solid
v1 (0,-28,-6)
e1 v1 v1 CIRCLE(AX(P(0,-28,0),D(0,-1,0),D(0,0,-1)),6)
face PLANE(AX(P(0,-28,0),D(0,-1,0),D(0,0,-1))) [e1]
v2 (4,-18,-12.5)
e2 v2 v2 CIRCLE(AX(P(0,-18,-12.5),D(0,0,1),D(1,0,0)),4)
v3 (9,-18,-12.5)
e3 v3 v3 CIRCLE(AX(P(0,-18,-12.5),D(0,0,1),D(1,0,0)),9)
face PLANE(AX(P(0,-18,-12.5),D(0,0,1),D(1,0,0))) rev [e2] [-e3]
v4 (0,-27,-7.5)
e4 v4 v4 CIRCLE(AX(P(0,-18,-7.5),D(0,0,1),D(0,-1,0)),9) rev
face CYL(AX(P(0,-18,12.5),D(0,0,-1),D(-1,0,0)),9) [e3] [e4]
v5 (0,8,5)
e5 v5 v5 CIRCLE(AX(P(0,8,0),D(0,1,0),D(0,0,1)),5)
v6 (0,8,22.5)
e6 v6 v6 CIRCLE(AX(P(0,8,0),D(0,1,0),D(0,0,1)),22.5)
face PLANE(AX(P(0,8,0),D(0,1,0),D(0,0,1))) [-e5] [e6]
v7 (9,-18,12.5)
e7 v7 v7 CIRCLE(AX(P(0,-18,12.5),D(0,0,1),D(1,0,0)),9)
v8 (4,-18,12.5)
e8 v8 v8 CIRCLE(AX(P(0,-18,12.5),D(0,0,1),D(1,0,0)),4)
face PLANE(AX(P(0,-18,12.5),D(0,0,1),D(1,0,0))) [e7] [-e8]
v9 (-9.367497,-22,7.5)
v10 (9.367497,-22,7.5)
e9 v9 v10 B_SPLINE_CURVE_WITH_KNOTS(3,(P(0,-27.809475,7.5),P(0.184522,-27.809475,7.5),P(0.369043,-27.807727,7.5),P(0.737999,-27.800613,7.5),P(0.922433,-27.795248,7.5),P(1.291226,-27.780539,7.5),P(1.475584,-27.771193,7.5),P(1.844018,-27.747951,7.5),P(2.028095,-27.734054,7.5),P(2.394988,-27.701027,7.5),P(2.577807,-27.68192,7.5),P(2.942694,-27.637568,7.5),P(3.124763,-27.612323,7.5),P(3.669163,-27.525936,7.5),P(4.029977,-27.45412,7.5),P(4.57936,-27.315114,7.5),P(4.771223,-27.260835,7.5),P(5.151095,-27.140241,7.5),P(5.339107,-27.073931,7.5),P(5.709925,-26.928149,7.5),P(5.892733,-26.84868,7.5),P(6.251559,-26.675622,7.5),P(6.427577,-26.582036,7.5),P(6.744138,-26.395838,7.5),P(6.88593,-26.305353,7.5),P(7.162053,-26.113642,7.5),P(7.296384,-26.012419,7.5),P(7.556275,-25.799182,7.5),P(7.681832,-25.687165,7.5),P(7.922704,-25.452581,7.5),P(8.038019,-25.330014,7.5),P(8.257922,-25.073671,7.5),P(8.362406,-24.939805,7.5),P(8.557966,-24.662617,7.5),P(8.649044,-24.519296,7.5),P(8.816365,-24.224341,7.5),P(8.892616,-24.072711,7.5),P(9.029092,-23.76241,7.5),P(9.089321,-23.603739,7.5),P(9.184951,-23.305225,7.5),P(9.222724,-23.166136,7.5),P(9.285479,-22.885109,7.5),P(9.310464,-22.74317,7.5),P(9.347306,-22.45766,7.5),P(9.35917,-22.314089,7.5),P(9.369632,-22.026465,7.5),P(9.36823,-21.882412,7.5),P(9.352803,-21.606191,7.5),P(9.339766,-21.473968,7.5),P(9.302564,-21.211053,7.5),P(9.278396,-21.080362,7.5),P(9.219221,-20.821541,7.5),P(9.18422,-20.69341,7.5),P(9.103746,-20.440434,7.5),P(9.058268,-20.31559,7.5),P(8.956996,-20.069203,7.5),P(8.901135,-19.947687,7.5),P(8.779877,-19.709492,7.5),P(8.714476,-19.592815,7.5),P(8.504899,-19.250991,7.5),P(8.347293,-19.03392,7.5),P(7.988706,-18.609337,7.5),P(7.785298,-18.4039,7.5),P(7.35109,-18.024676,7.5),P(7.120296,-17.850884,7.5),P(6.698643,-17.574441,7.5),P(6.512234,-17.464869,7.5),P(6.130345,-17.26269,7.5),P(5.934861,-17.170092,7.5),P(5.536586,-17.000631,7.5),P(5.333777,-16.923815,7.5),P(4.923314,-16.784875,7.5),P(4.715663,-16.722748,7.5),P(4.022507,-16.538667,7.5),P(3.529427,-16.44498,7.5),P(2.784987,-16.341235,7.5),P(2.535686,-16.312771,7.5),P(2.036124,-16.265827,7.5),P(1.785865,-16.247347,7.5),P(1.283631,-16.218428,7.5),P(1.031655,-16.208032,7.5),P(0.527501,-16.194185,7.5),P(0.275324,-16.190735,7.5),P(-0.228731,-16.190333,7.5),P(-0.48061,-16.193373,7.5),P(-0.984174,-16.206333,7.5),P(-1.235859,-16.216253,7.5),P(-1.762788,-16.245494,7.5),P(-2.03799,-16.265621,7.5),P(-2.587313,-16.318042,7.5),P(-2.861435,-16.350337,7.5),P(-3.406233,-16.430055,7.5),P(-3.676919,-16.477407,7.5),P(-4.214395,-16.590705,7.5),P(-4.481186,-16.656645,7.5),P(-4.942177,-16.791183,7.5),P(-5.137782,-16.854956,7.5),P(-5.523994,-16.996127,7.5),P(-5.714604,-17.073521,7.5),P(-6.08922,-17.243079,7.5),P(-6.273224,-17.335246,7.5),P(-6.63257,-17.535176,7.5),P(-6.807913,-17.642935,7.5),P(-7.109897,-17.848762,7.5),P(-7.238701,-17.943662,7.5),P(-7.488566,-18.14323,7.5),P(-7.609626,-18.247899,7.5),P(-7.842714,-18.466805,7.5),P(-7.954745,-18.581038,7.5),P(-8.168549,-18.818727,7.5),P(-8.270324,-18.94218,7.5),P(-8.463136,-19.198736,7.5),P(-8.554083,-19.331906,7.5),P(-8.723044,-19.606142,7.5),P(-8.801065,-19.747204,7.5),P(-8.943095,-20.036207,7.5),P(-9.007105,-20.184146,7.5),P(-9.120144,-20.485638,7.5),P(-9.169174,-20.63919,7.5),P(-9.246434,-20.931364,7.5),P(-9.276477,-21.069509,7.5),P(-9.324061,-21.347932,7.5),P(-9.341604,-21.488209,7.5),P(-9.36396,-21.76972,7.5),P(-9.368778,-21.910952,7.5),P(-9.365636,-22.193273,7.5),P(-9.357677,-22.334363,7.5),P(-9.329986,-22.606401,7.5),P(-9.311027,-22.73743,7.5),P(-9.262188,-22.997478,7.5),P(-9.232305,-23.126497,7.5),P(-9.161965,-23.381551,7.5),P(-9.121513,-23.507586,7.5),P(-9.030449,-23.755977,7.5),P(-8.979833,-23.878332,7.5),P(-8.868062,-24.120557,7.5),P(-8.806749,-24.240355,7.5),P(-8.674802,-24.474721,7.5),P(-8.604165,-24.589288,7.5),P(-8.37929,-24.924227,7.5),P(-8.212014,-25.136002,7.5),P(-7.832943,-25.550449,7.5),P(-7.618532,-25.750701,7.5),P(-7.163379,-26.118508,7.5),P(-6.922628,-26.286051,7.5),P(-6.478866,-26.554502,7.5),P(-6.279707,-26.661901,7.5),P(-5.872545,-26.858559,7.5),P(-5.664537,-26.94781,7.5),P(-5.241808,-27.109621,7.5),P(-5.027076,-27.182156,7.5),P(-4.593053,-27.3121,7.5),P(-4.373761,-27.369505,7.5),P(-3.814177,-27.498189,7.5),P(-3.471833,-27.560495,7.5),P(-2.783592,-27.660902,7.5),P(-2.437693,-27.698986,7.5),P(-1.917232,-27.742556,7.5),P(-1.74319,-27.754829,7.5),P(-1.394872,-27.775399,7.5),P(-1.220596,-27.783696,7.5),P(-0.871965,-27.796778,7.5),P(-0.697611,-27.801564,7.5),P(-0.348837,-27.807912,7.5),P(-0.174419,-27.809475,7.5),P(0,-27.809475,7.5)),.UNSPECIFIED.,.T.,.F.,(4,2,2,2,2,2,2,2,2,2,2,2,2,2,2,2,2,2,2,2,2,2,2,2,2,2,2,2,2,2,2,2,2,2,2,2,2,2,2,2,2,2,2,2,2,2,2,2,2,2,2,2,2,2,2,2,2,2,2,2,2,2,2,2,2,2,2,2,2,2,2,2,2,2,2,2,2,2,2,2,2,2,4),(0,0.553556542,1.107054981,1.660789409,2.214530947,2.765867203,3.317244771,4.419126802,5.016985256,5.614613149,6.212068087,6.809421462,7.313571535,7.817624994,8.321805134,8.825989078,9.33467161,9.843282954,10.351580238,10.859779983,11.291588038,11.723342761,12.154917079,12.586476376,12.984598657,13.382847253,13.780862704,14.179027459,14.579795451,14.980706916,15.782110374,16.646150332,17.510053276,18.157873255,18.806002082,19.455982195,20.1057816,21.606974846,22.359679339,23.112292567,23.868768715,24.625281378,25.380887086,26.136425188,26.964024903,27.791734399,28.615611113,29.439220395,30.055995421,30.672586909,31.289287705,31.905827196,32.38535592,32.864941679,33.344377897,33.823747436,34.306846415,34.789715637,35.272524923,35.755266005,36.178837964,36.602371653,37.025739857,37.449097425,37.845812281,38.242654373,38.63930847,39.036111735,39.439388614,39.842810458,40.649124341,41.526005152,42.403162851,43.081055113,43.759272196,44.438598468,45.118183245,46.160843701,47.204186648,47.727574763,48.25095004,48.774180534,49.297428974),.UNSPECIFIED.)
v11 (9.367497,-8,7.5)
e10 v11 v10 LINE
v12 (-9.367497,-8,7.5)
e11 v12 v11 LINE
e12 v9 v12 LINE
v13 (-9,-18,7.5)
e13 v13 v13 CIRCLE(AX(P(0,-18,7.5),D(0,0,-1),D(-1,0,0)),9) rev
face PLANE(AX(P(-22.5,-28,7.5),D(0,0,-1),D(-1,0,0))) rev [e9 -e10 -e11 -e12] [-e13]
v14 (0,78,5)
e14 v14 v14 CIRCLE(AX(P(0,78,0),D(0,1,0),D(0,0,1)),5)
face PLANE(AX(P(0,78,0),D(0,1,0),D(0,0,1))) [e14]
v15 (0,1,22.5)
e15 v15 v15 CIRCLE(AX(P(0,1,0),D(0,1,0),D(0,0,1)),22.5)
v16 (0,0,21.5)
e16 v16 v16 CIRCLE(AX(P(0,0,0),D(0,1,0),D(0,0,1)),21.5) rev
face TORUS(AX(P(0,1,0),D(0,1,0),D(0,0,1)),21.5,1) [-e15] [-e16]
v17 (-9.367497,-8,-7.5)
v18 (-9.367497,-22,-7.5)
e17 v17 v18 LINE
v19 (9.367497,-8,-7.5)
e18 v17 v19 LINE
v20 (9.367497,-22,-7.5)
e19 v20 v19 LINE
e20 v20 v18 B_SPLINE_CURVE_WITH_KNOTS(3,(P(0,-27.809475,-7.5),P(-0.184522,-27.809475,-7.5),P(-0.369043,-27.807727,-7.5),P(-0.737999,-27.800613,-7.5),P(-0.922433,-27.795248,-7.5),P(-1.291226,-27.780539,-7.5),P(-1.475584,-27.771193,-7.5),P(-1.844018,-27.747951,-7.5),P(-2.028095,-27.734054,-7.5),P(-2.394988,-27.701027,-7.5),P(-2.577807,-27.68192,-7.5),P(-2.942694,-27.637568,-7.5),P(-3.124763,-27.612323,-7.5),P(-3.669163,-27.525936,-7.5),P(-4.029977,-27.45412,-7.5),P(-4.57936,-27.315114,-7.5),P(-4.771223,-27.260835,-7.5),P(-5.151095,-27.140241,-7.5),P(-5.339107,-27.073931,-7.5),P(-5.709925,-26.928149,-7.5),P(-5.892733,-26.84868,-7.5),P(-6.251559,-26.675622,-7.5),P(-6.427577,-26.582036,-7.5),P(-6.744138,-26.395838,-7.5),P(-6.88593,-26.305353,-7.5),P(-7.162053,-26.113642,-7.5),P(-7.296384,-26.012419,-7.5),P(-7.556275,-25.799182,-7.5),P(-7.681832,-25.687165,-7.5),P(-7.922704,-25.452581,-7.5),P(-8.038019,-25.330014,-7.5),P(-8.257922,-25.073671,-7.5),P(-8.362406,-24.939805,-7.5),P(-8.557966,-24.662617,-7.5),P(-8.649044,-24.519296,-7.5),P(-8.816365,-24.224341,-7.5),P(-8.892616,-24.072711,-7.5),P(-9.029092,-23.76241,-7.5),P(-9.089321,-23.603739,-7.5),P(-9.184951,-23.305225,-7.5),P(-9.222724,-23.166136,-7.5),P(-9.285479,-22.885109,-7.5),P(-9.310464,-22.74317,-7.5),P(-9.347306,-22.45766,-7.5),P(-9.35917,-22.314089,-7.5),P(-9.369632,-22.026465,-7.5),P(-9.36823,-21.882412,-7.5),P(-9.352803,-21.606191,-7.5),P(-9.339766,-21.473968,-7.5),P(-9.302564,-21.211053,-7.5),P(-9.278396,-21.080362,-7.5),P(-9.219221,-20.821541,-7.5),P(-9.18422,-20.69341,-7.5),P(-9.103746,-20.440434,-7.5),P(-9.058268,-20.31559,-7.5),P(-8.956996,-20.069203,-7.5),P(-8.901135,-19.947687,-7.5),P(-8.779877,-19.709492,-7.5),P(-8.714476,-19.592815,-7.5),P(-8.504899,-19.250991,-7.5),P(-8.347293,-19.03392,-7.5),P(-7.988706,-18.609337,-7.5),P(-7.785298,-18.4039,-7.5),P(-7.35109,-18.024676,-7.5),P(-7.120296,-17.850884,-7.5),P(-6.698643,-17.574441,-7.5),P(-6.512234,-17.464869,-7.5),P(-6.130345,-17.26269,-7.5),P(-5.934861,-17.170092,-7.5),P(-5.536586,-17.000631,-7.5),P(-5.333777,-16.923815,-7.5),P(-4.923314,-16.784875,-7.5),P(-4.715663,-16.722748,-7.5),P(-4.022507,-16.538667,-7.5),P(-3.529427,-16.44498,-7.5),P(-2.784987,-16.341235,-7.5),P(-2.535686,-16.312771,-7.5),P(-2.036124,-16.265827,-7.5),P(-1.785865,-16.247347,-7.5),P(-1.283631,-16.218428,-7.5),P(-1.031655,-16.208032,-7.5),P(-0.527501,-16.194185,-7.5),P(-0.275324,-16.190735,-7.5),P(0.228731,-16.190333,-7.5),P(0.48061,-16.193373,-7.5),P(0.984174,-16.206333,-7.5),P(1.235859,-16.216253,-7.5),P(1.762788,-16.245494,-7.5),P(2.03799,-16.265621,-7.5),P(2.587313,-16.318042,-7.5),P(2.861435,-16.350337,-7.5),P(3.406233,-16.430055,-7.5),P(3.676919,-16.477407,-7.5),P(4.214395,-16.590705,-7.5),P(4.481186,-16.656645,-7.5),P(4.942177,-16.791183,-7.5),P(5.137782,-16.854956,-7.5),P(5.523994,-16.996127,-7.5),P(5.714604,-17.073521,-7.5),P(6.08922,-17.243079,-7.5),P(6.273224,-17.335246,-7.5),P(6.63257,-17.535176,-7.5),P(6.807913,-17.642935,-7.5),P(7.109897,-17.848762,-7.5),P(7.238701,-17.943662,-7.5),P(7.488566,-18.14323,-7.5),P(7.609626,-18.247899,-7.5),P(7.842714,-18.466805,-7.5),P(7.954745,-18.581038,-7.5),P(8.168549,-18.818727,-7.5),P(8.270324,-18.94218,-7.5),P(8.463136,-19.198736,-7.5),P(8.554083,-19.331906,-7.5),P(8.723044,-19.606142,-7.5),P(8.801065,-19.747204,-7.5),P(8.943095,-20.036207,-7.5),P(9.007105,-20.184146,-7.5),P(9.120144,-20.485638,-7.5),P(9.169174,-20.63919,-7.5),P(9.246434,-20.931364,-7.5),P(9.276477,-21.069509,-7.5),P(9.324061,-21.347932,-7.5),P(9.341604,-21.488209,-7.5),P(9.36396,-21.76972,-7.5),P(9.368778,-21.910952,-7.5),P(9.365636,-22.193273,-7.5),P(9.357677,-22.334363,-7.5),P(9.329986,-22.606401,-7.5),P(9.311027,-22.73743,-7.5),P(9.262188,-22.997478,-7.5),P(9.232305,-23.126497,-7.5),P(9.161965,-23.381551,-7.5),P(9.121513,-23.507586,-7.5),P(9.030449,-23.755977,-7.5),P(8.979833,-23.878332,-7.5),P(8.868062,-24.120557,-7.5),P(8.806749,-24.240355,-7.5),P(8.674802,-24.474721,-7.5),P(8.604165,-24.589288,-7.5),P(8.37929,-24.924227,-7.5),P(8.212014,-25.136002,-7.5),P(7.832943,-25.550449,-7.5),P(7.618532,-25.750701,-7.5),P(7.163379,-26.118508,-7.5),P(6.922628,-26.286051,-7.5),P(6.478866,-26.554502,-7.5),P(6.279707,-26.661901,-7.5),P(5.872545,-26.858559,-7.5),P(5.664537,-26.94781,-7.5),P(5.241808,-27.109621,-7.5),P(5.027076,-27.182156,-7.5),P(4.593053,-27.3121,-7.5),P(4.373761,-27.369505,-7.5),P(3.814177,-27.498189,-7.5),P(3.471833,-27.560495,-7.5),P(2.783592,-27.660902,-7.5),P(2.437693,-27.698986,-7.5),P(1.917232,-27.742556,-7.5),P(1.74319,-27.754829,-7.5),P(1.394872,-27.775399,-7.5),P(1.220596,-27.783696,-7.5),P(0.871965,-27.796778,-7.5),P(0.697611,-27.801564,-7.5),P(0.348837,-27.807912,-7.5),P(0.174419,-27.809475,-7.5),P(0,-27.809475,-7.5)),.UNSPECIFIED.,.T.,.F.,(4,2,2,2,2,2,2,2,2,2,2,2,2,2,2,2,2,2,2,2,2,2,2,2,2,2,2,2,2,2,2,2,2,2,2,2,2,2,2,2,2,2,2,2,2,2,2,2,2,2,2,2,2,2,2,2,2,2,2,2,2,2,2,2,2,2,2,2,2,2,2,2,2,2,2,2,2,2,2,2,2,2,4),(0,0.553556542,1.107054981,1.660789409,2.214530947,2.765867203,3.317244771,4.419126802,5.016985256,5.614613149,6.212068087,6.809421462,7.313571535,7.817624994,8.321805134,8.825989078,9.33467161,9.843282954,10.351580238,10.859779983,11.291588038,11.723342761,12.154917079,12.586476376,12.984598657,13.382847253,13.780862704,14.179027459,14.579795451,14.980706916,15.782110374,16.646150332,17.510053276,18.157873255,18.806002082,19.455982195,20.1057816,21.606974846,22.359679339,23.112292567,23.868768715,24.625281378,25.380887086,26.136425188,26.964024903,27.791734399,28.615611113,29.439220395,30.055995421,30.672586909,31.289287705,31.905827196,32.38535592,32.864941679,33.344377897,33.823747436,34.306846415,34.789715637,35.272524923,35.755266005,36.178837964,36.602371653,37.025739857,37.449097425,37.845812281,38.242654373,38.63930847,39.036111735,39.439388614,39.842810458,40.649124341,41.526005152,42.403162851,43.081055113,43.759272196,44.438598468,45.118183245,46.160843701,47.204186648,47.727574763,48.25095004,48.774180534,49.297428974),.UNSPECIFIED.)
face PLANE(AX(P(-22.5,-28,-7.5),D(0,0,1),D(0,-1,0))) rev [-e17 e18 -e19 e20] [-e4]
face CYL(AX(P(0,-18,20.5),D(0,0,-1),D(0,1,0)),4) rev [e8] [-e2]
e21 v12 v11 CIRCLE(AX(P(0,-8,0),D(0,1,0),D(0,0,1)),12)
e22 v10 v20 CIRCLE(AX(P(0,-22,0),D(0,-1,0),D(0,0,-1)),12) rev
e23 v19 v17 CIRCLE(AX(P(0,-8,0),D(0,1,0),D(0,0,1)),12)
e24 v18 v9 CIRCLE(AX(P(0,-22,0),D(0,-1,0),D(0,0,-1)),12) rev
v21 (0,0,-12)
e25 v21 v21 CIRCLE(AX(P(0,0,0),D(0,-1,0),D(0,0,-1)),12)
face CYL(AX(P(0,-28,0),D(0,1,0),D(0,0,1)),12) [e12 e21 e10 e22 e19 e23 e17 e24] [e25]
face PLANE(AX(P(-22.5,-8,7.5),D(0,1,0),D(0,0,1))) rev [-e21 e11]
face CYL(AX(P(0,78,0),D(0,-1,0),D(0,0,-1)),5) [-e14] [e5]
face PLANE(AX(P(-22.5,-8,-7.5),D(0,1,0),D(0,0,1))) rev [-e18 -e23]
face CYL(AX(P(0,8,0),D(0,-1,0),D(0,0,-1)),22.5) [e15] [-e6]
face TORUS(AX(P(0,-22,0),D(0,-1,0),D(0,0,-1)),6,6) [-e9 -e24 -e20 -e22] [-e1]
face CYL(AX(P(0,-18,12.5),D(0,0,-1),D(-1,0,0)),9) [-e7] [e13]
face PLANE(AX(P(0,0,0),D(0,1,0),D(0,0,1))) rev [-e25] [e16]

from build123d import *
from build123d.topology import SkipClean

# Parameters (mm, degrees)
SKETCH2_R               = 22.5
BOSS_EXTRUDE1_DEPTH     = 8
SKETCH3_R               = 5
BOSS_EXTRUDE2_DEPTH     = 70
SKETCH4_R               = 12
BOSS_EXTRUDE3_DEPTH     = 28
FILLET1_R               = 6
CUT_EXTRUDE1_DEPTH      = 85.240726493
CUT_EXTRUDE1_DEPTH_BACK = 85.240726493
SKETCH5_W               = 15
SKETCH5_H               = 20
SKETCH6_R               = 4
CUT_EXTRUDE2_DEPTH      = 28
SKETCH7_R               = 9
SKETCH7_R_2             = 4
BOSS_EXTRUDE5_DEPTH     = 12.5
FILLET3_R               = 1


with BuildPart() as part:
    # Sketch2 → Boss-Extrude1 (new body)
    with BuildSketch(Plane(origin=(0, 0, 0), x_dir=(1, 0, 0), z_dir=(0, 1, 0))):
        Circle(SKETCH2_R)
    extrude(amount=BOSS_EXTRUDE1_DEPTH)

    # Sketch3 → Boss-Extrude2 (add)
    with BuildSketch(Plane(origin=(0, 8, 0), x_dir=(1, 0, 0), z_dir=(0, 1, 0))):
        Circle(SKETCH3_R)
    extrude(amount=BOSS_EXTRUDE2_DEPTH)

    # Sketch4 → Boss-Extrude3 (add)
    with BuildSketch(Plane.XZ):
        Circle(SKETCH4_R)
    extrude(amount=BOSS_EXTRUDE3_DEPTH)

    # Fillet1
    fillet1_edges = [part.edges().sort_by_distance(p)[0] for p in [
        (-12, -28, 0),
    ]]
    fillet(fillet1_edges, radius=FILLET1_R)

    # Sketch5 → Cut-Extrude1 (cut, two sides: drawn at the far end of the back side and taken through both)
    with BuildSketch(Plane(origin=(0, 0, 0), x_dir=(0, 0, -1), z_dir=(1, 0, 0)).offset(-CUT_EXTRUDE1_DEPTH_BACK)):
        with Locations((15, -18)):
            Rectangle(SKETCH5_W, SKETCH5_H)
        with Locations((-15, -18)):
            Rectangle(SKETCH5_W, SKETCH5_H)
    extrude(amount=CUT_EXTRUDE1_DEPTH + CUT_EXTRUDE1_DEPTH_BACK, mode=Mode.SUBTRACT)

    # Sketch6 → Cut-Extrude2 (cut)
    with BuildSketch(Plane(origin=(0, 0, -7.5), x_dir=(-1, 0, 0), z_dir=(0, 0, -1))):
        with Locations((0, -18)):
            Circle(SKETCH6_R)
    extrude(amount=-CUT_EXTRUDE2_DEPTH, mode=Mode.SUBTRACT)

    # Sketch7 → Boss-Extrude5 (add, symmetric)
    with SkipClean():  # the faces are left unmerged after this step: merging them gives an invalid solid
        with BuildSketch(Plane.XY):
            with Locations((0, -18)):
                Circle(SKETCH7_R)
            with Locations((0, -18)):
                Circle(SKETCH7_R_2, mode=Mode.SUBTRACT)
        extrude(amount=BOSS_EXTRUDE5_DEPTH, both=True)
    add(part.part.scale(1), mode=Mode.REPLACE)  # the faces are merged on a copy

    # Fillet3
    fillet3_edges = [part.edges().sort_by_distance(p)[0] for p in [
        (-22.5, 0, 0),
    ]]
    fillet(fillet3_edges, radius=FILLET3_R)


solid = part.part
